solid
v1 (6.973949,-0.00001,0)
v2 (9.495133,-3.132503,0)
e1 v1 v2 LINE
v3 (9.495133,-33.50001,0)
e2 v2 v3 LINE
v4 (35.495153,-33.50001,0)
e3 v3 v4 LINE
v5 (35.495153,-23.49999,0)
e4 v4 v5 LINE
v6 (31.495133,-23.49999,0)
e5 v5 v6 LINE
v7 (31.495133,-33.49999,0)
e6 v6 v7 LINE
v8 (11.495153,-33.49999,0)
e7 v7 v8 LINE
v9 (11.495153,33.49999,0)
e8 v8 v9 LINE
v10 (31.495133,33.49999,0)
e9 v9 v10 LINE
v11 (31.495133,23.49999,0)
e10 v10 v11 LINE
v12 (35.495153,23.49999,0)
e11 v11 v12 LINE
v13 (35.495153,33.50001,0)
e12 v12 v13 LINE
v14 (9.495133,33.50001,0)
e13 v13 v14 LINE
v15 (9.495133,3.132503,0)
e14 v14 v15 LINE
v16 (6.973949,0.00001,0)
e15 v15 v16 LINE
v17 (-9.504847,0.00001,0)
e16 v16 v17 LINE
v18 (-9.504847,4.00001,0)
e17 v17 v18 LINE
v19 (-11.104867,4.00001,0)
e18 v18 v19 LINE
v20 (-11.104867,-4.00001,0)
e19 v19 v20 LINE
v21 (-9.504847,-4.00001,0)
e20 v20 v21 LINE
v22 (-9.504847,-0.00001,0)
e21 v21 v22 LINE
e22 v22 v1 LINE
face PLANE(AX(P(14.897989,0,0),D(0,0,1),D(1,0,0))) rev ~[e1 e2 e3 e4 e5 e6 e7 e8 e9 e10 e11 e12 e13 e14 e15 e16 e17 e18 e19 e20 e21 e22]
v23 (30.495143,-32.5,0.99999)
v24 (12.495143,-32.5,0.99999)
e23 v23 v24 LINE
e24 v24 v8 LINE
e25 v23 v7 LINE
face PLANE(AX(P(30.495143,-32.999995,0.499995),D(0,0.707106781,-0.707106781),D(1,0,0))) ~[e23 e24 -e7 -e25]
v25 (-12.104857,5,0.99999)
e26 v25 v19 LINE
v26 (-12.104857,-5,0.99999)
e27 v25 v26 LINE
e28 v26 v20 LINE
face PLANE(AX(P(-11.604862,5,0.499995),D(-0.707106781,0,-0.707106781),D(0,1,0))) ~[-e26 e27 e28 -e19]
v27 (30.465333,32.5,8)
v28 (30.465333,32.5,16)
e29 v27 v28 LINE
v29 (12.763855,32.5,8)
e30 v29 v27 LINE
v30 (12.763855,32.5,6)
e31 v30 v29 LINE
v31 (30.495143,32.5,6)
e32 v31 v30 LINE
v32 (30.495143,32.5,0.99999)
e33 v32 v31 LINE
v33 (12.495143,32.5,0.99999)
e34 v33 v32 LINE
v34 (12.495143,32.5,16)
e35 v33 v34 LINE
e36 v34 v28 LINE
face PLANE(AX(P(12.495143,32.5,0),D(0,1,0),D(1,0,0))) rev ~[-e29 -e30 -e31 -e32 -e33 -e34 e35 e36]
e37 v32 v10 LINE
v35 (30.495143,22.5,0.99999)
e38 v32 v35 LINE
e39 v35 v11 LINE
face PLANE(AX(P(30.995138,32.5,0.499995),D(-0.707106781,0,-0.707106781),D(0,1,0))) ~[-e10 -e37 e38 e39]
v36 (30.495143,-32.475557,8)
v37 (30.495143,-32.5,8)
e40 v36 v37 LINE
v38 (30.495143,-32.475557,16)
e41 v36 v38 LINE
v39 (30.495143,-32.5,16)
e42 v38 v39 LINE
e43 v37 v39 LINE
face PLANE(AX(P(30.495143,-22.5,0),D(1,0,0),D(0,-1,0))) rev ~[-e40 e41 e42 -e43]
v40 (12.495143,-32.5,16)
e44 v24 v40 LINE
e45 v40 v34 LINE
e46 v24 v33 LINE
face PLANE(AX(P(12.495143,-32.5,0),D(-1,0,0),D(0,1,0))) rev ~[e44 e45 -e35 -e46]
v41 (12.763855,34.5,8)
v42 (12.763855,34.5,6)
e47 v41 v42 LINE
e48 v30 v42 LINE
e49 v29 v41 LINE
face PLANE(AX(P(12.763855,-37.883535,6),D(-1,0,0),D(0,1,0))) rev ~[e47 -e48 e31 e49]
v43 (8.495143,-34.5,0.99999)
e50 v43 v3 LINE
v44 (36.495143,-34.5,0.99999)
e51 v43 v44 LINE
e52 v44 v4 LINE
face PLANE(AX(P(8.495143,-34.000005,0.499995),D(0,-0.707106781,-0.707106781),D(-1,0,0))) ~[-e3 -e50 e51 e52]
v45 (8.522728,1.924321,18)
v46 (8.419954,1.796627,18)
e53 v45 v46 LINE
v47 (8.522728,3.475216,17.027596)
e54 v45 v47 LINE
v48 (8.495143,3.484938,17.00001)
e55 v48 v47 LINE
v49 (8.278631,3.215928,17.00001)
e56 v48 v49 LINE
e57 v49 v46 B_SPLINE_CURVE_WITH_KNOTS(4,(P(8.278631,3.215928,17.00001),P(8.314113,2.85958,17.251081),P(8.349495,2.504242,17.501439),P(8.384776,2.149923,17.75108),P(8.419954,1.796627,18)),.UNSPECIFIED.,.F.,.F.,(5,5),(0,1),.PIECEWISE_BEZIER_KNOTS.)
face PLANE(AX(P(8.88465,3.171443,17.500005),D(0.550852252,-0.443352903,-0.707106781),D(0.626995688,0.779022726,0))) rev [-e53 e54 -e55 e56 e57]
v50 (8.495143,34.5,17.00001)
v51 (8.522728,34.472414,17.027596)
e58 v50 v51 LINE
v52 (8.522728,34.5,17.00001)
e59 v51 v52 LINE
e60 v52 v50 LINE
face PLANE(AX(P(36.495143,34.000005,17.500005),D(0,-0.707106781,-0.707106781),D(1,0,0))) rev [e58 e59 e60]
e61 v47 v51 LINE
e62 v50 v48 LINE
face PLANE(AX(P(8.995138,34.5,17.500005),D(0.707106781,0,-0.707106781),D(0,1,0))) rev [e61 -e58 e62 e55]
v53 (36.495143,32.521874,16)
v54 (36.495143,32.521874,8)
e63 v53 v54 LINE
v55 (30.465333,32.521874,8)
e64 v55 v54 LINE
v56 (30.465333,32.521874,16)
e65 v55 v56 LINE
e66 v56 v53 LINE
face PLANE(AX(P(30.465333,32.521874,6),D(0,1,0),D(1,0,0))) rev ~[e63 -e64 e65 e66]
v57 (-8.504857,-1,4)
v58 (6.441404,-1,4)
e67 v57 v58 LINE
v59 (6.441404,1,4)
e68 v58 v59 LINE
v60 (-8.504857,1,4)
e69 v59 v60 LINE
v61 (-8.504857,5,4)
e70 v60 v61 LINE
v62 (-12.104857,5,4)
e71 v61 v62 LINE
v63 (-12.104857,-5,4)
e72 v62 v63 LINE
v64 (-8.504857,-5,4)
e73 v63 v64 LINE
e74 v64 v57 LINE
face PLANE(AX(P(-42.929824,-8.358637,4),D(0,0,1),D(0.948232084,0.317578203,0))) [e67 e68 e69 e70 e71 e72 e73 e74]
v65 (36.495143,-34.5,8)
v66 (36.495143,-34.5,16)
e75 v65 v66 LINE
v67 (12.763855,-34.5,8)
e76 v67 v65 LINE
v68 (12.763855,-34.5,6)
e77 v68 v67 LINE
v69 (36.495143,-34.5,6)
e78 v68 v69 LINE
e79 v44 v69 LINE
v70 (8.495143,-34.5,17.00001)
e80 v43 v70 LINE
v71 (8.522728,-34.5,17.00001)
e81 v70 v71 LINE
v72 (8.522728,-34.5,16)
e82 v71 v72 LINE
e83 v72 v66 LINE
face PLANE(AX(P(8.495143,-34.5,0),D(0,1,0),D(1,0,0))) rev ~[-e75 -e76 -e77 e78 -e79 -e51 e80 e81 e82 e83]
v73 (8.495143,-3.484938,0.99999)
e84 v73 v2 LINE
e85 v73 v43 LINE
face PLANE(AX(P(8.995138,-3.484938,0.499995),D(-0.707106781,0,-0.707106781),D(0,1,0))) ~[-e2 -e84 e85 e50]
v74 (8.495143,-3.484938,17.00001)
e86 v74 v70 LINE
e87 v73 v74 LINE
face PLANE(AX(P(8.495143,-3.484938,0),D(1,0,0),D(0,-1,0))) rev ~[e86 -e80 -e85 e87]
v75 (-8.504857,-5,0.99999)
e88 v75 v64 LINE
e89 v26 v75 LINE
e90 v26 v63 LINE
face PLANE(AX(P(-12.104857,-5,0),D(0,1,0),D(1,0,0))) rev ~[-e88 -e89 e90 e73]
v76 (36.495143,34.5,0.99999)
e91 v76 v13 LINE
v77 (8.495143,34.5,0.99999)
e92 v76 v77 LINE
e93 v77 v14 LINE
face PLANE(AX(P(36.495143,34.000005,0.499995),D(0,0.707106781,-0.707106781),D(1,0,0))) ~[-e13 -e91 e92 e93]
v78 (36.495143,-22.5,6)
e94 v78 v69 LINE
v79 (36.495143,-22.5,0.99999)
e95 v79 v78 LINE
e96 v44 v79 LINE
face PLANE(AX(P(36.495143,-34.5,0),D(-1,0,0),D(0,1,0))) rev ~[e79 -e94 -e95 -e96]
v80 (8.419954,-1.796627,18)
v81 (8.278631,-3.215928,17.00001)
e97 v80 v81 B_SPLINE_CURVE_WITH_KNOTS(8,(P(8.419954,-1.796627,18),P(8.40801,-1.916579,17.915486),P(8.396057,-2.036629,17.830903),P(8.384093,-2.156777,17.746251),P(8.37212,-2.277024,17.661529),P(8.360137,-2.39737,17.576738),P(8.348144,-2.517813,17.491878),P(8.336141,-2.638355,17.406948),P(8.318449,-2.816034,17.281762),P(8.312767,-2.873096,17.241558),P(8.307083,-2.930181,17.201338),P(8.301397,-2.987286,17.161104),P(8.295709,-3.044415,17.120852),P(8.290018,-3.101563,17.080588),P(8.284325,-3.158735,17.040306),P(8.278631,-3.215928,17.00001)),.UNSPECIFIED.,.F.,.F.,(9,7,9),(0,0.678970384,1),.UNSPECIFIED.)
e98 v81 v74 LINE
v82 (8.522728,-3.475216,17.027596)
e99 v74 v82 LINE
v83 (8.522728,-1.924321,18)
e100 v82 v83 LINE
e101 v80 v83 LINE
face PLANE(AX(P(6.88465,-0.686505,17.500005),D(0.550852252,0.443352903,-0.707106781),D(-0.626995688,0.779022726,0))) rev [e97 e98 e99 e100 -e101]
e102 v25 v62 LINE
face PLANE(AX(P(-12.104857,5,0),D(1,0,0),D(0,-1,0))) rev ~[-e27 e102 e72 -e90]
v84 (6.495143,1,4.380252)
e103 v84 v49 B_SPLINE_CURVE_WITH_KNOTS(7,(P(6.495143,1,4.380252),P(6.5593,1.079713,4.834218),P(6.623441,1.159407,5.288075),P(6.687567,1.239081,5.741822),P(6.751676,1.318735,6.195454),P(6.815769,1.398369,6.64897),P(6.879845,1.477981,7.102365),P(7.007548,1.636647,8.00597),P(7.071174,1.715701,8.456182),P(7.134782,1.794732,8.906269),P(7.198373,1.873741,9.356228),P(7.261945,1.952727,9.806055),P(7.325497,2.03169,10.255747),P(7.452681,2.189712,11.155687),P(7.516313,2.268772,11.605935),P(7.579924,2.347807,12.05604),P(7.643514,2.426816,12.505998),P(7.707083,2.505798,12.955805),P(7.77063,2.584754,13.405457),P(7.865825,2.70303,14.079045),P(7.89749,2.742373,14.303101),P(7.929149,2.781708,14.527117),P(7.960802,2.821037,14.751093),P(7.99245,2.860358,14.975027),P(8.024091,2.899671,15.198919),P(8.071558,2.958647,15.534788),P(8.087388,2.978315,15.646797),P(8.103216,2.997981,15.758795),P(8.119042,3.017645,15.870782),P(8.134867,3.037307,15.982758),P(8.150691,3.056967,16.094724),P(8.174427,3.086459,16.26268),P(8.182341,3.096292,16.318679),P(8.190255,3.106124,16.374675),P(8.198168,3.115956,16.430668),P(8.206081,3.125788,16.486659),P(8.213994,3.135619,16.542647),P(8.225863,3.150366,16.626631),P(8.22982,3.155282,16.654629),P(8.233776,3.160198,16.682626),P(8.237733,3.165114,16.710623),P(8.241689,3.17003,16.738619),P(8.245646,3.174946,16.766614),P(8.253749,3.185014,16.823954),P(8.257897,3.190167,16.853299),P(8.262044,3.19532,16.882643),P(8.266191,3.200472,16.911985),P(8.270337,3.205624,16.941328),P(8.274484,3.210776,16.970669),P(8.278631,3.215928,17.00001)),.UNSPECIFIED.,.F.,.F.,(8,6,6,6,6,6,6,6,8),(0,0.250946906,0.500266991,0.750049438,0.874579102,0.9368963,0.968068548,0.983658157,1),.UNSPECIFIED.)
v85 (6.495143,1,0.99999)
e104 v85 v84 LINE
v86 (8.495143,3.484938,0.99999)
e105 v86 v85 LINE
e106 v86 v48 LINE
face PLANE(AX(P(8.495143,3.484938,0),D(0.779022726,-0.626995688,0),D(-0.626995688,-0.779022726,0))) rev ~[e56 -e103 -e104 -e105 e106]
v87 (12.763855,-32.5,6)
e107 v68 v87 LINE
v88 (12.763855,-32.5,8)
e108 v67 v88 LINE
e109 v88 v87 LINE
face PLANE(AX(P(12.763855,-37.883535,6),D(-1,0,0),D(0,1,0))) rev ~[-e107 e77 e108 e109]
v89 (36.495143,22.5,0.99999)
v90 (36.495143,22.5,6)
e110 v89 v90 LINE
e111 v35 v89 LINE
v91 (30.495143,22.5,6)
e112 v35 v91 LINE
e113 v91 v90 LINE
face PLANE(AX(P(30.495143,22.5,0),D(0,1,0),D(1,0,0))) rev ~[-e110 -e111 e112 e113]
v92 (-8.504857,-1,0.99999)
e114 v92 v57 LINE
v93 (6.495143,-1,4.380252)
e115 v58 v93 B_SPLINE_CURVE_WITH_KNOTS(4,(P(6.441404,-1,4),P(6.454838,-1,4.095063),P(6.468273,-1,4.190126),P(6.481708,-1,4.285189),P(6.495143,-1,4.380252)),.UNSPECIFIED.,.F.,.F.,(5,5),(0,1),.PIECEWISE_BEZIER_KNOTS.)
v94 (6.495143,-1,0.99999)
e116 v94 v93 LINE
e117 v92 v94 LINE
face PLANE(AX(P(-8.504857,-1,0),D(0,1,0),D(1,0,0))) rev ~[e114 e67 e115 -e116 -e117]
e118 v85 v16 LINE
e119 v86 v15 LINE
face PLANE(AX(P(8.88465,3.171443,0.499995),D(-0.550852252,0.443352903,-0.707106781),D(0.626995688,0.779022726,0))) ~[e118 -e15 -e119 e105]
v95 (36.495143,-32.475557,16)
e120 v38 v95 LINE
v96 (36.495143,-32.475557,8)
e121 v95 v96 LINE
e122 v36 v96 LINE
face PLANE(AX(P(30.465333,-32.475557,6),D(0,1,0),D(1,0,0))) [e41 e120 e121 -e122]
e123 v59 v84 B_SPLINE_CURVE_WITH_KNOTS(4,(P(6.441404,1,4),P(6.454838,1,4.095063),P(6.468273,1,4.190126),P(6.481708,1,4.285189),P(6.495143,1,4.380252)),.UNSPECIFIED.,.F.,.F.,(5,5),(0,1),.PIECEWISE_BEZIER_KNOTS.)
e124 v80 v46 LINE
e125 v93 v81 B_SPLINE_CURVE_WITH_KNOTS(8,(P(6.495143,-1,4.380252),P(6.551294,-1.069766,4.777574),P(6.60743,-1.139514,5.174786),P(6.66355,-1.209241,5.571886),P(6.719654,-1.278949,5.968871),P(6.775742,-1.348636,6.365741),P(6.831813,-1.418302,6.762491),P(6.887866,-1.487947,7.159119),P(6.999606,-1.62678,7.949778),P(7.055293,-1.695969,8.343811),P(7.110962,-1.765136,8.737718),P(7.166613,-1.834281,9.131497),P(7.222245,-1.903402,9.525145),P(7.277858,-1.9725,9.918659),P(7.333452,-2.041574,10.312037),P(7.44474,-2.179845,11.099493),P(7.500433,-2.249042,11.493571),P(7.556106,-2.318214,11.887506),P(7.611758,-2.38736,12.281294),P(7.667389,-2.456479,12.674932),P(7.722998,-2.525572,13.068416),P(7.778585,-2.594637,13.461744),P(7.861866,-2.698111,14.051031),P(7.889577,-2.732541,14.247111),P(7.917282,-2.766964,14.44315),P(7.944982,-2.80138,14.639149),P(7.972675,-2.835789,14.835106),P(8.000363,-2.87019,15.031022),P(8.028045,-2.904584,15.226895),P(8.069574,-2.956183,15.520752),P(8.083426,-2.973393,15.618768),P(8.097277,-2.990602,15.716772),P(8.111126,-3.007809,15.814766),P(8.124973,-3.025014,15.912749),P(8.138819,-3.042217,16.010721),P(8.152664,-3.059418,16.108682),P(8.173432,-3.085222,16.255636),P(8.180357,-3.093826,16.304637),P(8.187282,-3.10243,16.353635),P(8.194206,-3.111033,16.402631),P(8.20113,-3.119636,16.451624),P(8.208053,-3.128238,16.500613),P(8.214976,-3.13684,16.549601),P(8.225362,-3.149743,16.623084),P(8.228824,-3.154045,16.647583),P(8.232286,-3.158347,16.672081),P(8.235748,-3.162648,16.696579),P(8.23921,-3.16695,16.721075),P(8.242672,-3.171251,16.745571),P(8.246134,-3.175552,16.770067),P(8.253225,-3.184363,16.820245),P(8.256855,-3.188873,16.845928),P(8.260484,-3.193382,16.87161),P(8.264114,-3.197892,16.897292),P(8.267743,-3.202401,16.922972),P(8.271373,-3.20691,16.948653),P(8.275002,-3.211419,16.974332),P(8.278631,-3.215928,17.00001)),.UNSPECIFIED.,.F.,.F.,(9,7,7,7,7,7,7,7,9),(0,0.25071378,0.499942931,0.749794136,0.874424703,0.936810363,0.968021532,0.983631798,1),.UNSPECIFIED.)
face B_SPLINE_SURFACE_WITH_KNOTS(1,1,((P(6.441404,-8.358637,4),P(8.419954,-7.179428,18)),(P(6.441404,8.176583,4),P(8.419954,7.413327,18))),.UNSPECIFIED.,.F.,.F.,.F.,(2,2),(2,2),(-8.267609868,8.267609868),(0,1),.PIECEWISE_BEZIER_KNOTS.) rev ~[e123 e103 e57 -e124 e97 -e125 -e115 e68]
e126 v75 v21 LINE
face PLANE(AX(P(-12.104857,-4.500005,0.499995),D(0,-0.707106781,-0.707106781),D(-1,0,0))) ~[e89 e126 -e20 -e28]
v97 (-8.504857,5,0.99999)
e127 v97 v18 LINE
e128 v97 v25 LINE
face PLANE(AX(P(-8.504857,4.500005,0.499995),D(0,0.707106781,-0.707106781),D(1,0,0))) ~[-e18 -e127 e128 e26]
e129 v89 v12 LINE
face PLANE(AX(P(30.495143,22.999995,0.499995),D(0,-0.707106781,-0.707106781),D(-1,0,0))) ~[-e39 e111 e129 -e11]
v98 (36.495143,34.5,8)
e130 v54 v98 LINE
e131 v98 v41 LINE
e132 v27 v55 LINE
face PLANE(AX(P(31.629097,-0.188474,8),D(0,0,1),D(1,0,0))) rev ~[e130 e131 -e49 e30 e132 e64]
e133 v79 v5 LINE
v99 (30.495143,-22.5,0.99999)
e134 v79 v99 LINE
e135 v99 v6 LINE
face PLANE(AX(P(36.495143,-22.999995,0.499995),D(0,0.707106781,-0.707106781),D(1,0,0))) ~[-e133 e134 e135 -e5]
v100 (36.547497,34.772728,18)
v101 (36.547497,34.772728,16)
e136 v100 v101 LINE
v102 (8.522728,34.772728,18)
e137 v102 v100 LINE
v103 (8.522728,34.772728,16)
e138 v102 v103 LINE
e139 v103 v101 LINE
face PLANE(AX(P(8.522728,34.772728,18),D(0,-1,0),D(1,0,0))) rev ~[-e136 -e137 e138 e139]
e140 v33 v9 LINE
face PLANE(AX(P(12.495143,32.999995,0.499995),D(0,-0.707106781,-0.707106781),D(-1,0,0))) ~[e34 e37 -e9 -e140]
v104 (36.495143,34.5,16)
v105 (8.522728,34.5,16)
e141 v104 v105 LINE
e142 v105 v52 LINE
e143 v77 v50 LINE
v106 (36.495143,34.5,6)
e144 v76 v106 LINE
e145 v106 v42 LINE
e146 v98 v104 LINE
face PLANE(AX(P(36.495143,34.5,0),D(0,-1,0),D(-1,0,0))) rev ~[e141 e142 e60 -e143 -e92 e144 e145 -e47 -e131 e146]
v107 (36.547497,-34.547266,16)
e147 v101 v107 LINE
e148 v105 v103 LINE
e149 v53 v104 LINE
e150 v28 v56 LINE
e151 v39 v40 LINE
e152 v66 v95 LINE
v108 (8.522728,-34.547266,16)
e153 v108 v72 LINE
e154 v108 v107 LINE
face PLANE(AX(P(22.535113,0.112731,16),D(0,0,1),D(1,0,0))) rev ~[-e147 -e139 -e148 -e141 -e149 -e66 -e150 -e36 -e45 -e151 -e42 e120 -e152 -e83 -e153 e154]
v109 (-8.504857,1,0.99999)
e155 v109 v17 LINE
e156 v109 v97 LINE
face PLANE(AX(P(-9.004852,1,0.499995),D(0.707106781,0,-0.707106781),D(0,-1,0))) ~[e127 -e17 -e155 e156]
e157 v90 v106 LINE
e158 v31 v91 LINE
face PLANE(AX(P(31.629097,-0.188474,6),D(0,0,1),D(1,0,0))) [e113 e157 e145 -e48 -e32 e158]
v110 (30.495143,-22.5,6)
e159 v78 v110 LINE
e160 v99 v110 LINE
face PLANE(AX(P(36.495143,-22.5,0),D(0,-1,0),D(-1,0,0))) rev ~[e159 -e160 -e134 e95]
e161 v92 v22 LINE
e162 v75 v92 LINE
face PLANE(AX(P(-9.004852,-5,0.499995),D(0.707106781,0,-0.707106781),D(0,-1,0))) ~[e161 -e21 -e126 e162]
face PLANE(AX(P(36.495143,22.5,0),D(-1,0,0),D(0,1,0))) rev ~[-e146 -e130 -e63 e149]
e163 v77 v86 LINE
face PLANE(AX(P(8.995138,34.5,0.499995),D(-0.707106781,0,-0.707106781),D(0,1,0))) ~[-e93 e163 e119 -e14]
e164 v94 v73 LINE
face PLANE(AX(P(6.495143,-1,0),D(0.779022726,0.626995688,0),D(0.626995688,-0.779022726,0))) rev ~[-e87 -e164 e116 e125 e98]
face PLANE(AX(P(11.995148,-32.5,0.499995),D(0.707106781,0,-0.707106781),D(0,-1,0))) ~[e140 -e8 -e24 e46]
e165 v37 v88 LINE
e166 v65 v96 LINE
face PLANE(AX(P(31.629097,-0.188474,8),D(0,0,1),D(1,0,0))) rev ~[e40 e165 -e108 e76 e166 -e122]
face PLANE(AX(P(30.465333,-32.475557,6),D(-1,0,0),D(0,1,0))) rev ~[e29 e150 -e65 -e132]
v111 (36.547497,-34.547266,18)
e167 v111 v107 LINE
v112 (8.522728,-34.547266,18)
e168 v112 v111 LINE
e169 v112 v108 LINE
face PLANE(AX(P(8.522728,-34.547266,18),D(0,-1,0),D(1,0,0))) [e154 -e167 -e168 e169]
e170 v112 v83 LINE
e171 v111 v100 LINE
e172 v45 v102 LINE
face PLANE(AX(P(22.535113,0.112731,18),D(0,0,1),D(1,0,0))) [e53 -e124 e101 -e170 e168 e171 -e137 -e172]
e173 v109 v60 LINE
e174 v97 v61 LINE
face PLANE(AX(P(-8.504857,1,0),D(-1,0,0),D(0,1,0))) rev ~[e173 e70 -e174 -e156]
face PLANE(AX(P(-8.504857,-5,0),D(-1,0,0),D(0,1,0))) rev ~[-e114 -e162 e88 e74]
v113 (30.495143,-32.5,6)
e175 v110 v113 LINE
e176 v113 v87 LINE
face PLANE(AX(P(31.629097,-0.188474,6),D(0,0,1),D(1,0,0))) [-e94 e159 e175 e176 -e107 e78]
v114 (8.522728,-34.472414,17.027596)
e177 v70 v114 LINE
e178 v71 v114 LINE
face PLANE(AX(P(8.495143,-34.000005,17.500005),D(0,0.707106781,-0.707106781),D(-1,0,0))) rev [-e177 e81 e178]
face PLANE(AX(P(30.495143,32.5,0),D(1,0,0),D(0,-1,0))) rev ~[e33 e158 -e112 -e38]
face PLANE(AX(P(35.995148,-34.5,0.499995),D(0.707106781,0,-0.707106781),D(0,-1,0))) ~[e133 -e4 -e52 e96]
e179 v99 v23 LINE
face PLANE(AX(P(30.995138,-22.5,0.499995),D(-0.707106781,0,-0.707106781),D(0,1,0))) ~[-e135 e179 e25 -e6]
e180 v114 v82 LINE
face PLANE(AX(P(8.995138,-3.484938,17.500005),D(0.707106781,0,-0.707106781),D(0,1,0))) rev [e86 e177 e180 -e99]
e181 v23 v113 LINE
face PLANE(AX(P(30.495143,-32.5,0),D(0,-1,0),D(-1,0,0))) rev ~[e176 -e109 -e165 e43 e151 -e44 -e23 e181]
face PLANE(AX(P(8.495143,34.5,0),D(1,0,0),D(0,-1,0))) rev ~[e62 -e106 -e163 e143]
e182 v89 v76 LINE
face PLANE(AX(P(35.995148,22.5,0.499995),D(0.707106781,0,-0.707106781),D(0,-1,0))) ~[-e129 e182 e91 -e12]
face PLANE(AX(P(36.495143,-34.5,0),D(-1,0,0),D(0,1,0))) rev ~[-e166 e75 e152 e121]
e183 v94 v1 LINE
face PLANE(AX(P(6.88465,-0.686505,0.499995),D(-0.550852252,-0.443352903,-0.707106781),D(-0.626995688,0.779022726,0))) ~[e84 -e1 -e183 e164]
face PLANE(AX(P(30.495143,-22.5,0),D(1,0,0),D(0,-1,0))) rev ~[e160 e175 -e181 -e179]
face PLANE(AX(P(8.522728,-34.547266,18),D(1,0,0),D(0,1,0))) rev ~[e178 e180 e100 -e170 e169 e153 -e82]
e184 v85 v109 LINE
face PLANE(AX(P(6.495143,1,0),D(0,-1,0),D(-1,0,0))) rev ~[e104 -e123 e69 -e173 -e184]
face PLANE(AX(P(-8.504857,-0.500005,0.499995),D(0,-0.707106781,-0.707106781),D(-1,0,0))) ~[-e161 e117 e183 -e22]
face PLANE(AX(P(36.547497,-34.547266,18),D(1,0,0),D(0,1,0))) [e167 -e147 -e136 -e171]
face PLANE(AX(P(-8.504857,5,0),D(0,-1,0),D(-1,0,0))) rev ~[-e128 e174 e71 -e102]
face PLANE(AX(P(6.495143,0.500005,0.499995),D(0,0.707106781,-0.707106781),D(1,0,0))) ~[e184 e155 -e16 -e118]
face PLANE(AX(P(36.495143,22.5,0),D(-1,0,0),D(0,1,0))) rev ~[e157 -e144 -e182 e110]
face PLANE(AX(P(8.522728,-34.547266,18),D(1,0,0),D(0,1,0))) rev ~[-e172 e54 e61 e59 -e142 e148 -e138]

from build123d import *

# Parameters (mm, degrees)
F1_DEPTH  = 18
F2_SIZE   = 0.99999
F4_W      = 49.3712280877
F4_H      = 16.5352197364
F6_W      = 25.0472677872
F6_H      = 14.5927555859
F8_W      = 28.0247684568
F8_H      = 69.3199932575
F9_DEPTH  = 2
F11_W     = 7.2507392615
F11_H     = 64.9974308908
F12_DEPTH = 10
F13_W     = 37.7304842696
F13_H     = 75.3901228309
F14_DEPTH = 2


# Not quite as in the source:
# - a fillet or chamfer is up to 0.001 mm smaller than in the source, because OpenCascade refuses the exact size


with BuildPart() as f1:
    # F0 (on Top) → F1 (new body)
    with BuildSketch(Plane.XY):
        Polygon((-8.5048572017, 5), (-12.1048572017, 5), (-12.1048572017, 0), (-12.1048572017, -5), (-8.5048572017, -5), (-8.5048572017, -1), (6.4951427983, -1), (8.4951427983, -3.4849380649), (8.4951427983, -34.5), (36.4951427983, -34.5), (36.4951427983, -22.5), (30.4951427983, -22.5), (30.4951427983, -32.5), (12.4951427983, -32.5), (12.4951427983, 0), (12.4951427983, 32.5), (30.4951427983, 32.5), (30.4951427983, 22.5), (36.4951427983, 22.5), (36.4951427983, 34.5), (8.4951427983, 34.5), (8.4951427983, 3.4849380649), (6.4951427983, 1), (-8.5048572017, 1), align=None)
    extrude(amount=F1_DEPTH)

    # F2 (size 1 in the source; OpenCascade refuses exactly that, so slightly less here)
    f2_edges = [f1.edges().sort_by_distance(p)[0] for p in [
        (-10.304857, 5, 18),
        (-12.104857, 0, 18),
        (-10.304857, -5, 18),
        (-8.504857, -3, 18),
        (-1.004857, -1, 18),
        (7.495143, -2.242469, 18),
        (8.495143, -18.992469, 18),
        (22.495143, -34.5, 18),
        (36.495143, -28.5, 18),
        (33.495143, -22.5, 18),
        (30.495143, -27.5, 18),
        (21.495143, -32.5, 18),
        (12.495143, 0, 18),
        (21.495143, 32.5, 18),
        (30.495143, 27.5, 18),
        (33.495143, 22.5, 18),
        (36.495143, 28.5, 18),
        (22.495143, 34.5, 18),
        (8.495143, 18.992469, 18),
        (7.495143, 2.242469, 18),
        (-1.004857, 1, 18),
        (-8.504857, 3, 18),
        (-10.304857, 5, 0),
        (-12.104857, 0, 0),
        (-10.304857, -5, 0),
        (-8.504857, -3, 0),
        (-1.004857, -1, 0),
        (7.495143, -2.242469, 0),
        (8.495143, -18.992469, 0),
        (22.495143, -34.5, 0),
        (36.495143, -28.5, 0),
        (33.495143, -22.5, 0),
        (30.495143, -27.5, 0),
        (21.495143, -32.5, 0),
        (12.495143, 0, 0),
        (21.495143, 32.5, 0),
        (30.495143, 27.5, 0),
        (33.495143, 22.5, 0),
        (36.495143, 28.5, 0),
        (22.495143, 34.5, 0),
        (8.495143, 18.992469, 0),
        (7.495143, 2.242469, 0),
        (-1.004857, 1, 0),
        (-8.504857, 3, 0),
    ]]
    chamfer(f2_edges, length=F2_SIZE)

    # F4 (on offset) → F7 section 0
    with BuildSketch(Plane.XY.offset(4)):
        with Locations((-18.2442103978, -0.0910270028)):
            Rectangle(F4_W, F4_H)
    # F6 (on offset) → F7 section 1
    with BuildSketch(Plane.XY.offset(18)):
        with Locations((-4.1036796756, 0.1169494353)):
            Rectangle(F6_W, F6_H)
    loft(mode=Mode.SUBTRACT)

    # F8 (on offset) → F9 (join)
    with BuildSketch(Plane.XY.offset(18)):
        with Locations((22.5351126865, 0.1127310097)):
            Rectangle(F8_W, F8_H)
    extrude(amount=-F9_DEPTH)

    # F11 (on offset) → F12 (cut)
    with BuildSketch(Plane.XY.offset(6)):
        with Locations((34.090702422, 0.0231582671)):
            Rectangle(F11_W, F11_H)
    extrude(amount=F12_DEPTH, mode=Mode.SUBTRACT)

    # F13 (on offset) → F14 (cut)
    with BuildSketch(Plane.XY.offset(6)):
        with Locations((31.6290971823, -0.1884736121)):
            Rectangle(F13_W, F13_H)
    extrude(amount=F14_DEPTH, mode=Mode.SUBTRACT)


solid = f1.part
